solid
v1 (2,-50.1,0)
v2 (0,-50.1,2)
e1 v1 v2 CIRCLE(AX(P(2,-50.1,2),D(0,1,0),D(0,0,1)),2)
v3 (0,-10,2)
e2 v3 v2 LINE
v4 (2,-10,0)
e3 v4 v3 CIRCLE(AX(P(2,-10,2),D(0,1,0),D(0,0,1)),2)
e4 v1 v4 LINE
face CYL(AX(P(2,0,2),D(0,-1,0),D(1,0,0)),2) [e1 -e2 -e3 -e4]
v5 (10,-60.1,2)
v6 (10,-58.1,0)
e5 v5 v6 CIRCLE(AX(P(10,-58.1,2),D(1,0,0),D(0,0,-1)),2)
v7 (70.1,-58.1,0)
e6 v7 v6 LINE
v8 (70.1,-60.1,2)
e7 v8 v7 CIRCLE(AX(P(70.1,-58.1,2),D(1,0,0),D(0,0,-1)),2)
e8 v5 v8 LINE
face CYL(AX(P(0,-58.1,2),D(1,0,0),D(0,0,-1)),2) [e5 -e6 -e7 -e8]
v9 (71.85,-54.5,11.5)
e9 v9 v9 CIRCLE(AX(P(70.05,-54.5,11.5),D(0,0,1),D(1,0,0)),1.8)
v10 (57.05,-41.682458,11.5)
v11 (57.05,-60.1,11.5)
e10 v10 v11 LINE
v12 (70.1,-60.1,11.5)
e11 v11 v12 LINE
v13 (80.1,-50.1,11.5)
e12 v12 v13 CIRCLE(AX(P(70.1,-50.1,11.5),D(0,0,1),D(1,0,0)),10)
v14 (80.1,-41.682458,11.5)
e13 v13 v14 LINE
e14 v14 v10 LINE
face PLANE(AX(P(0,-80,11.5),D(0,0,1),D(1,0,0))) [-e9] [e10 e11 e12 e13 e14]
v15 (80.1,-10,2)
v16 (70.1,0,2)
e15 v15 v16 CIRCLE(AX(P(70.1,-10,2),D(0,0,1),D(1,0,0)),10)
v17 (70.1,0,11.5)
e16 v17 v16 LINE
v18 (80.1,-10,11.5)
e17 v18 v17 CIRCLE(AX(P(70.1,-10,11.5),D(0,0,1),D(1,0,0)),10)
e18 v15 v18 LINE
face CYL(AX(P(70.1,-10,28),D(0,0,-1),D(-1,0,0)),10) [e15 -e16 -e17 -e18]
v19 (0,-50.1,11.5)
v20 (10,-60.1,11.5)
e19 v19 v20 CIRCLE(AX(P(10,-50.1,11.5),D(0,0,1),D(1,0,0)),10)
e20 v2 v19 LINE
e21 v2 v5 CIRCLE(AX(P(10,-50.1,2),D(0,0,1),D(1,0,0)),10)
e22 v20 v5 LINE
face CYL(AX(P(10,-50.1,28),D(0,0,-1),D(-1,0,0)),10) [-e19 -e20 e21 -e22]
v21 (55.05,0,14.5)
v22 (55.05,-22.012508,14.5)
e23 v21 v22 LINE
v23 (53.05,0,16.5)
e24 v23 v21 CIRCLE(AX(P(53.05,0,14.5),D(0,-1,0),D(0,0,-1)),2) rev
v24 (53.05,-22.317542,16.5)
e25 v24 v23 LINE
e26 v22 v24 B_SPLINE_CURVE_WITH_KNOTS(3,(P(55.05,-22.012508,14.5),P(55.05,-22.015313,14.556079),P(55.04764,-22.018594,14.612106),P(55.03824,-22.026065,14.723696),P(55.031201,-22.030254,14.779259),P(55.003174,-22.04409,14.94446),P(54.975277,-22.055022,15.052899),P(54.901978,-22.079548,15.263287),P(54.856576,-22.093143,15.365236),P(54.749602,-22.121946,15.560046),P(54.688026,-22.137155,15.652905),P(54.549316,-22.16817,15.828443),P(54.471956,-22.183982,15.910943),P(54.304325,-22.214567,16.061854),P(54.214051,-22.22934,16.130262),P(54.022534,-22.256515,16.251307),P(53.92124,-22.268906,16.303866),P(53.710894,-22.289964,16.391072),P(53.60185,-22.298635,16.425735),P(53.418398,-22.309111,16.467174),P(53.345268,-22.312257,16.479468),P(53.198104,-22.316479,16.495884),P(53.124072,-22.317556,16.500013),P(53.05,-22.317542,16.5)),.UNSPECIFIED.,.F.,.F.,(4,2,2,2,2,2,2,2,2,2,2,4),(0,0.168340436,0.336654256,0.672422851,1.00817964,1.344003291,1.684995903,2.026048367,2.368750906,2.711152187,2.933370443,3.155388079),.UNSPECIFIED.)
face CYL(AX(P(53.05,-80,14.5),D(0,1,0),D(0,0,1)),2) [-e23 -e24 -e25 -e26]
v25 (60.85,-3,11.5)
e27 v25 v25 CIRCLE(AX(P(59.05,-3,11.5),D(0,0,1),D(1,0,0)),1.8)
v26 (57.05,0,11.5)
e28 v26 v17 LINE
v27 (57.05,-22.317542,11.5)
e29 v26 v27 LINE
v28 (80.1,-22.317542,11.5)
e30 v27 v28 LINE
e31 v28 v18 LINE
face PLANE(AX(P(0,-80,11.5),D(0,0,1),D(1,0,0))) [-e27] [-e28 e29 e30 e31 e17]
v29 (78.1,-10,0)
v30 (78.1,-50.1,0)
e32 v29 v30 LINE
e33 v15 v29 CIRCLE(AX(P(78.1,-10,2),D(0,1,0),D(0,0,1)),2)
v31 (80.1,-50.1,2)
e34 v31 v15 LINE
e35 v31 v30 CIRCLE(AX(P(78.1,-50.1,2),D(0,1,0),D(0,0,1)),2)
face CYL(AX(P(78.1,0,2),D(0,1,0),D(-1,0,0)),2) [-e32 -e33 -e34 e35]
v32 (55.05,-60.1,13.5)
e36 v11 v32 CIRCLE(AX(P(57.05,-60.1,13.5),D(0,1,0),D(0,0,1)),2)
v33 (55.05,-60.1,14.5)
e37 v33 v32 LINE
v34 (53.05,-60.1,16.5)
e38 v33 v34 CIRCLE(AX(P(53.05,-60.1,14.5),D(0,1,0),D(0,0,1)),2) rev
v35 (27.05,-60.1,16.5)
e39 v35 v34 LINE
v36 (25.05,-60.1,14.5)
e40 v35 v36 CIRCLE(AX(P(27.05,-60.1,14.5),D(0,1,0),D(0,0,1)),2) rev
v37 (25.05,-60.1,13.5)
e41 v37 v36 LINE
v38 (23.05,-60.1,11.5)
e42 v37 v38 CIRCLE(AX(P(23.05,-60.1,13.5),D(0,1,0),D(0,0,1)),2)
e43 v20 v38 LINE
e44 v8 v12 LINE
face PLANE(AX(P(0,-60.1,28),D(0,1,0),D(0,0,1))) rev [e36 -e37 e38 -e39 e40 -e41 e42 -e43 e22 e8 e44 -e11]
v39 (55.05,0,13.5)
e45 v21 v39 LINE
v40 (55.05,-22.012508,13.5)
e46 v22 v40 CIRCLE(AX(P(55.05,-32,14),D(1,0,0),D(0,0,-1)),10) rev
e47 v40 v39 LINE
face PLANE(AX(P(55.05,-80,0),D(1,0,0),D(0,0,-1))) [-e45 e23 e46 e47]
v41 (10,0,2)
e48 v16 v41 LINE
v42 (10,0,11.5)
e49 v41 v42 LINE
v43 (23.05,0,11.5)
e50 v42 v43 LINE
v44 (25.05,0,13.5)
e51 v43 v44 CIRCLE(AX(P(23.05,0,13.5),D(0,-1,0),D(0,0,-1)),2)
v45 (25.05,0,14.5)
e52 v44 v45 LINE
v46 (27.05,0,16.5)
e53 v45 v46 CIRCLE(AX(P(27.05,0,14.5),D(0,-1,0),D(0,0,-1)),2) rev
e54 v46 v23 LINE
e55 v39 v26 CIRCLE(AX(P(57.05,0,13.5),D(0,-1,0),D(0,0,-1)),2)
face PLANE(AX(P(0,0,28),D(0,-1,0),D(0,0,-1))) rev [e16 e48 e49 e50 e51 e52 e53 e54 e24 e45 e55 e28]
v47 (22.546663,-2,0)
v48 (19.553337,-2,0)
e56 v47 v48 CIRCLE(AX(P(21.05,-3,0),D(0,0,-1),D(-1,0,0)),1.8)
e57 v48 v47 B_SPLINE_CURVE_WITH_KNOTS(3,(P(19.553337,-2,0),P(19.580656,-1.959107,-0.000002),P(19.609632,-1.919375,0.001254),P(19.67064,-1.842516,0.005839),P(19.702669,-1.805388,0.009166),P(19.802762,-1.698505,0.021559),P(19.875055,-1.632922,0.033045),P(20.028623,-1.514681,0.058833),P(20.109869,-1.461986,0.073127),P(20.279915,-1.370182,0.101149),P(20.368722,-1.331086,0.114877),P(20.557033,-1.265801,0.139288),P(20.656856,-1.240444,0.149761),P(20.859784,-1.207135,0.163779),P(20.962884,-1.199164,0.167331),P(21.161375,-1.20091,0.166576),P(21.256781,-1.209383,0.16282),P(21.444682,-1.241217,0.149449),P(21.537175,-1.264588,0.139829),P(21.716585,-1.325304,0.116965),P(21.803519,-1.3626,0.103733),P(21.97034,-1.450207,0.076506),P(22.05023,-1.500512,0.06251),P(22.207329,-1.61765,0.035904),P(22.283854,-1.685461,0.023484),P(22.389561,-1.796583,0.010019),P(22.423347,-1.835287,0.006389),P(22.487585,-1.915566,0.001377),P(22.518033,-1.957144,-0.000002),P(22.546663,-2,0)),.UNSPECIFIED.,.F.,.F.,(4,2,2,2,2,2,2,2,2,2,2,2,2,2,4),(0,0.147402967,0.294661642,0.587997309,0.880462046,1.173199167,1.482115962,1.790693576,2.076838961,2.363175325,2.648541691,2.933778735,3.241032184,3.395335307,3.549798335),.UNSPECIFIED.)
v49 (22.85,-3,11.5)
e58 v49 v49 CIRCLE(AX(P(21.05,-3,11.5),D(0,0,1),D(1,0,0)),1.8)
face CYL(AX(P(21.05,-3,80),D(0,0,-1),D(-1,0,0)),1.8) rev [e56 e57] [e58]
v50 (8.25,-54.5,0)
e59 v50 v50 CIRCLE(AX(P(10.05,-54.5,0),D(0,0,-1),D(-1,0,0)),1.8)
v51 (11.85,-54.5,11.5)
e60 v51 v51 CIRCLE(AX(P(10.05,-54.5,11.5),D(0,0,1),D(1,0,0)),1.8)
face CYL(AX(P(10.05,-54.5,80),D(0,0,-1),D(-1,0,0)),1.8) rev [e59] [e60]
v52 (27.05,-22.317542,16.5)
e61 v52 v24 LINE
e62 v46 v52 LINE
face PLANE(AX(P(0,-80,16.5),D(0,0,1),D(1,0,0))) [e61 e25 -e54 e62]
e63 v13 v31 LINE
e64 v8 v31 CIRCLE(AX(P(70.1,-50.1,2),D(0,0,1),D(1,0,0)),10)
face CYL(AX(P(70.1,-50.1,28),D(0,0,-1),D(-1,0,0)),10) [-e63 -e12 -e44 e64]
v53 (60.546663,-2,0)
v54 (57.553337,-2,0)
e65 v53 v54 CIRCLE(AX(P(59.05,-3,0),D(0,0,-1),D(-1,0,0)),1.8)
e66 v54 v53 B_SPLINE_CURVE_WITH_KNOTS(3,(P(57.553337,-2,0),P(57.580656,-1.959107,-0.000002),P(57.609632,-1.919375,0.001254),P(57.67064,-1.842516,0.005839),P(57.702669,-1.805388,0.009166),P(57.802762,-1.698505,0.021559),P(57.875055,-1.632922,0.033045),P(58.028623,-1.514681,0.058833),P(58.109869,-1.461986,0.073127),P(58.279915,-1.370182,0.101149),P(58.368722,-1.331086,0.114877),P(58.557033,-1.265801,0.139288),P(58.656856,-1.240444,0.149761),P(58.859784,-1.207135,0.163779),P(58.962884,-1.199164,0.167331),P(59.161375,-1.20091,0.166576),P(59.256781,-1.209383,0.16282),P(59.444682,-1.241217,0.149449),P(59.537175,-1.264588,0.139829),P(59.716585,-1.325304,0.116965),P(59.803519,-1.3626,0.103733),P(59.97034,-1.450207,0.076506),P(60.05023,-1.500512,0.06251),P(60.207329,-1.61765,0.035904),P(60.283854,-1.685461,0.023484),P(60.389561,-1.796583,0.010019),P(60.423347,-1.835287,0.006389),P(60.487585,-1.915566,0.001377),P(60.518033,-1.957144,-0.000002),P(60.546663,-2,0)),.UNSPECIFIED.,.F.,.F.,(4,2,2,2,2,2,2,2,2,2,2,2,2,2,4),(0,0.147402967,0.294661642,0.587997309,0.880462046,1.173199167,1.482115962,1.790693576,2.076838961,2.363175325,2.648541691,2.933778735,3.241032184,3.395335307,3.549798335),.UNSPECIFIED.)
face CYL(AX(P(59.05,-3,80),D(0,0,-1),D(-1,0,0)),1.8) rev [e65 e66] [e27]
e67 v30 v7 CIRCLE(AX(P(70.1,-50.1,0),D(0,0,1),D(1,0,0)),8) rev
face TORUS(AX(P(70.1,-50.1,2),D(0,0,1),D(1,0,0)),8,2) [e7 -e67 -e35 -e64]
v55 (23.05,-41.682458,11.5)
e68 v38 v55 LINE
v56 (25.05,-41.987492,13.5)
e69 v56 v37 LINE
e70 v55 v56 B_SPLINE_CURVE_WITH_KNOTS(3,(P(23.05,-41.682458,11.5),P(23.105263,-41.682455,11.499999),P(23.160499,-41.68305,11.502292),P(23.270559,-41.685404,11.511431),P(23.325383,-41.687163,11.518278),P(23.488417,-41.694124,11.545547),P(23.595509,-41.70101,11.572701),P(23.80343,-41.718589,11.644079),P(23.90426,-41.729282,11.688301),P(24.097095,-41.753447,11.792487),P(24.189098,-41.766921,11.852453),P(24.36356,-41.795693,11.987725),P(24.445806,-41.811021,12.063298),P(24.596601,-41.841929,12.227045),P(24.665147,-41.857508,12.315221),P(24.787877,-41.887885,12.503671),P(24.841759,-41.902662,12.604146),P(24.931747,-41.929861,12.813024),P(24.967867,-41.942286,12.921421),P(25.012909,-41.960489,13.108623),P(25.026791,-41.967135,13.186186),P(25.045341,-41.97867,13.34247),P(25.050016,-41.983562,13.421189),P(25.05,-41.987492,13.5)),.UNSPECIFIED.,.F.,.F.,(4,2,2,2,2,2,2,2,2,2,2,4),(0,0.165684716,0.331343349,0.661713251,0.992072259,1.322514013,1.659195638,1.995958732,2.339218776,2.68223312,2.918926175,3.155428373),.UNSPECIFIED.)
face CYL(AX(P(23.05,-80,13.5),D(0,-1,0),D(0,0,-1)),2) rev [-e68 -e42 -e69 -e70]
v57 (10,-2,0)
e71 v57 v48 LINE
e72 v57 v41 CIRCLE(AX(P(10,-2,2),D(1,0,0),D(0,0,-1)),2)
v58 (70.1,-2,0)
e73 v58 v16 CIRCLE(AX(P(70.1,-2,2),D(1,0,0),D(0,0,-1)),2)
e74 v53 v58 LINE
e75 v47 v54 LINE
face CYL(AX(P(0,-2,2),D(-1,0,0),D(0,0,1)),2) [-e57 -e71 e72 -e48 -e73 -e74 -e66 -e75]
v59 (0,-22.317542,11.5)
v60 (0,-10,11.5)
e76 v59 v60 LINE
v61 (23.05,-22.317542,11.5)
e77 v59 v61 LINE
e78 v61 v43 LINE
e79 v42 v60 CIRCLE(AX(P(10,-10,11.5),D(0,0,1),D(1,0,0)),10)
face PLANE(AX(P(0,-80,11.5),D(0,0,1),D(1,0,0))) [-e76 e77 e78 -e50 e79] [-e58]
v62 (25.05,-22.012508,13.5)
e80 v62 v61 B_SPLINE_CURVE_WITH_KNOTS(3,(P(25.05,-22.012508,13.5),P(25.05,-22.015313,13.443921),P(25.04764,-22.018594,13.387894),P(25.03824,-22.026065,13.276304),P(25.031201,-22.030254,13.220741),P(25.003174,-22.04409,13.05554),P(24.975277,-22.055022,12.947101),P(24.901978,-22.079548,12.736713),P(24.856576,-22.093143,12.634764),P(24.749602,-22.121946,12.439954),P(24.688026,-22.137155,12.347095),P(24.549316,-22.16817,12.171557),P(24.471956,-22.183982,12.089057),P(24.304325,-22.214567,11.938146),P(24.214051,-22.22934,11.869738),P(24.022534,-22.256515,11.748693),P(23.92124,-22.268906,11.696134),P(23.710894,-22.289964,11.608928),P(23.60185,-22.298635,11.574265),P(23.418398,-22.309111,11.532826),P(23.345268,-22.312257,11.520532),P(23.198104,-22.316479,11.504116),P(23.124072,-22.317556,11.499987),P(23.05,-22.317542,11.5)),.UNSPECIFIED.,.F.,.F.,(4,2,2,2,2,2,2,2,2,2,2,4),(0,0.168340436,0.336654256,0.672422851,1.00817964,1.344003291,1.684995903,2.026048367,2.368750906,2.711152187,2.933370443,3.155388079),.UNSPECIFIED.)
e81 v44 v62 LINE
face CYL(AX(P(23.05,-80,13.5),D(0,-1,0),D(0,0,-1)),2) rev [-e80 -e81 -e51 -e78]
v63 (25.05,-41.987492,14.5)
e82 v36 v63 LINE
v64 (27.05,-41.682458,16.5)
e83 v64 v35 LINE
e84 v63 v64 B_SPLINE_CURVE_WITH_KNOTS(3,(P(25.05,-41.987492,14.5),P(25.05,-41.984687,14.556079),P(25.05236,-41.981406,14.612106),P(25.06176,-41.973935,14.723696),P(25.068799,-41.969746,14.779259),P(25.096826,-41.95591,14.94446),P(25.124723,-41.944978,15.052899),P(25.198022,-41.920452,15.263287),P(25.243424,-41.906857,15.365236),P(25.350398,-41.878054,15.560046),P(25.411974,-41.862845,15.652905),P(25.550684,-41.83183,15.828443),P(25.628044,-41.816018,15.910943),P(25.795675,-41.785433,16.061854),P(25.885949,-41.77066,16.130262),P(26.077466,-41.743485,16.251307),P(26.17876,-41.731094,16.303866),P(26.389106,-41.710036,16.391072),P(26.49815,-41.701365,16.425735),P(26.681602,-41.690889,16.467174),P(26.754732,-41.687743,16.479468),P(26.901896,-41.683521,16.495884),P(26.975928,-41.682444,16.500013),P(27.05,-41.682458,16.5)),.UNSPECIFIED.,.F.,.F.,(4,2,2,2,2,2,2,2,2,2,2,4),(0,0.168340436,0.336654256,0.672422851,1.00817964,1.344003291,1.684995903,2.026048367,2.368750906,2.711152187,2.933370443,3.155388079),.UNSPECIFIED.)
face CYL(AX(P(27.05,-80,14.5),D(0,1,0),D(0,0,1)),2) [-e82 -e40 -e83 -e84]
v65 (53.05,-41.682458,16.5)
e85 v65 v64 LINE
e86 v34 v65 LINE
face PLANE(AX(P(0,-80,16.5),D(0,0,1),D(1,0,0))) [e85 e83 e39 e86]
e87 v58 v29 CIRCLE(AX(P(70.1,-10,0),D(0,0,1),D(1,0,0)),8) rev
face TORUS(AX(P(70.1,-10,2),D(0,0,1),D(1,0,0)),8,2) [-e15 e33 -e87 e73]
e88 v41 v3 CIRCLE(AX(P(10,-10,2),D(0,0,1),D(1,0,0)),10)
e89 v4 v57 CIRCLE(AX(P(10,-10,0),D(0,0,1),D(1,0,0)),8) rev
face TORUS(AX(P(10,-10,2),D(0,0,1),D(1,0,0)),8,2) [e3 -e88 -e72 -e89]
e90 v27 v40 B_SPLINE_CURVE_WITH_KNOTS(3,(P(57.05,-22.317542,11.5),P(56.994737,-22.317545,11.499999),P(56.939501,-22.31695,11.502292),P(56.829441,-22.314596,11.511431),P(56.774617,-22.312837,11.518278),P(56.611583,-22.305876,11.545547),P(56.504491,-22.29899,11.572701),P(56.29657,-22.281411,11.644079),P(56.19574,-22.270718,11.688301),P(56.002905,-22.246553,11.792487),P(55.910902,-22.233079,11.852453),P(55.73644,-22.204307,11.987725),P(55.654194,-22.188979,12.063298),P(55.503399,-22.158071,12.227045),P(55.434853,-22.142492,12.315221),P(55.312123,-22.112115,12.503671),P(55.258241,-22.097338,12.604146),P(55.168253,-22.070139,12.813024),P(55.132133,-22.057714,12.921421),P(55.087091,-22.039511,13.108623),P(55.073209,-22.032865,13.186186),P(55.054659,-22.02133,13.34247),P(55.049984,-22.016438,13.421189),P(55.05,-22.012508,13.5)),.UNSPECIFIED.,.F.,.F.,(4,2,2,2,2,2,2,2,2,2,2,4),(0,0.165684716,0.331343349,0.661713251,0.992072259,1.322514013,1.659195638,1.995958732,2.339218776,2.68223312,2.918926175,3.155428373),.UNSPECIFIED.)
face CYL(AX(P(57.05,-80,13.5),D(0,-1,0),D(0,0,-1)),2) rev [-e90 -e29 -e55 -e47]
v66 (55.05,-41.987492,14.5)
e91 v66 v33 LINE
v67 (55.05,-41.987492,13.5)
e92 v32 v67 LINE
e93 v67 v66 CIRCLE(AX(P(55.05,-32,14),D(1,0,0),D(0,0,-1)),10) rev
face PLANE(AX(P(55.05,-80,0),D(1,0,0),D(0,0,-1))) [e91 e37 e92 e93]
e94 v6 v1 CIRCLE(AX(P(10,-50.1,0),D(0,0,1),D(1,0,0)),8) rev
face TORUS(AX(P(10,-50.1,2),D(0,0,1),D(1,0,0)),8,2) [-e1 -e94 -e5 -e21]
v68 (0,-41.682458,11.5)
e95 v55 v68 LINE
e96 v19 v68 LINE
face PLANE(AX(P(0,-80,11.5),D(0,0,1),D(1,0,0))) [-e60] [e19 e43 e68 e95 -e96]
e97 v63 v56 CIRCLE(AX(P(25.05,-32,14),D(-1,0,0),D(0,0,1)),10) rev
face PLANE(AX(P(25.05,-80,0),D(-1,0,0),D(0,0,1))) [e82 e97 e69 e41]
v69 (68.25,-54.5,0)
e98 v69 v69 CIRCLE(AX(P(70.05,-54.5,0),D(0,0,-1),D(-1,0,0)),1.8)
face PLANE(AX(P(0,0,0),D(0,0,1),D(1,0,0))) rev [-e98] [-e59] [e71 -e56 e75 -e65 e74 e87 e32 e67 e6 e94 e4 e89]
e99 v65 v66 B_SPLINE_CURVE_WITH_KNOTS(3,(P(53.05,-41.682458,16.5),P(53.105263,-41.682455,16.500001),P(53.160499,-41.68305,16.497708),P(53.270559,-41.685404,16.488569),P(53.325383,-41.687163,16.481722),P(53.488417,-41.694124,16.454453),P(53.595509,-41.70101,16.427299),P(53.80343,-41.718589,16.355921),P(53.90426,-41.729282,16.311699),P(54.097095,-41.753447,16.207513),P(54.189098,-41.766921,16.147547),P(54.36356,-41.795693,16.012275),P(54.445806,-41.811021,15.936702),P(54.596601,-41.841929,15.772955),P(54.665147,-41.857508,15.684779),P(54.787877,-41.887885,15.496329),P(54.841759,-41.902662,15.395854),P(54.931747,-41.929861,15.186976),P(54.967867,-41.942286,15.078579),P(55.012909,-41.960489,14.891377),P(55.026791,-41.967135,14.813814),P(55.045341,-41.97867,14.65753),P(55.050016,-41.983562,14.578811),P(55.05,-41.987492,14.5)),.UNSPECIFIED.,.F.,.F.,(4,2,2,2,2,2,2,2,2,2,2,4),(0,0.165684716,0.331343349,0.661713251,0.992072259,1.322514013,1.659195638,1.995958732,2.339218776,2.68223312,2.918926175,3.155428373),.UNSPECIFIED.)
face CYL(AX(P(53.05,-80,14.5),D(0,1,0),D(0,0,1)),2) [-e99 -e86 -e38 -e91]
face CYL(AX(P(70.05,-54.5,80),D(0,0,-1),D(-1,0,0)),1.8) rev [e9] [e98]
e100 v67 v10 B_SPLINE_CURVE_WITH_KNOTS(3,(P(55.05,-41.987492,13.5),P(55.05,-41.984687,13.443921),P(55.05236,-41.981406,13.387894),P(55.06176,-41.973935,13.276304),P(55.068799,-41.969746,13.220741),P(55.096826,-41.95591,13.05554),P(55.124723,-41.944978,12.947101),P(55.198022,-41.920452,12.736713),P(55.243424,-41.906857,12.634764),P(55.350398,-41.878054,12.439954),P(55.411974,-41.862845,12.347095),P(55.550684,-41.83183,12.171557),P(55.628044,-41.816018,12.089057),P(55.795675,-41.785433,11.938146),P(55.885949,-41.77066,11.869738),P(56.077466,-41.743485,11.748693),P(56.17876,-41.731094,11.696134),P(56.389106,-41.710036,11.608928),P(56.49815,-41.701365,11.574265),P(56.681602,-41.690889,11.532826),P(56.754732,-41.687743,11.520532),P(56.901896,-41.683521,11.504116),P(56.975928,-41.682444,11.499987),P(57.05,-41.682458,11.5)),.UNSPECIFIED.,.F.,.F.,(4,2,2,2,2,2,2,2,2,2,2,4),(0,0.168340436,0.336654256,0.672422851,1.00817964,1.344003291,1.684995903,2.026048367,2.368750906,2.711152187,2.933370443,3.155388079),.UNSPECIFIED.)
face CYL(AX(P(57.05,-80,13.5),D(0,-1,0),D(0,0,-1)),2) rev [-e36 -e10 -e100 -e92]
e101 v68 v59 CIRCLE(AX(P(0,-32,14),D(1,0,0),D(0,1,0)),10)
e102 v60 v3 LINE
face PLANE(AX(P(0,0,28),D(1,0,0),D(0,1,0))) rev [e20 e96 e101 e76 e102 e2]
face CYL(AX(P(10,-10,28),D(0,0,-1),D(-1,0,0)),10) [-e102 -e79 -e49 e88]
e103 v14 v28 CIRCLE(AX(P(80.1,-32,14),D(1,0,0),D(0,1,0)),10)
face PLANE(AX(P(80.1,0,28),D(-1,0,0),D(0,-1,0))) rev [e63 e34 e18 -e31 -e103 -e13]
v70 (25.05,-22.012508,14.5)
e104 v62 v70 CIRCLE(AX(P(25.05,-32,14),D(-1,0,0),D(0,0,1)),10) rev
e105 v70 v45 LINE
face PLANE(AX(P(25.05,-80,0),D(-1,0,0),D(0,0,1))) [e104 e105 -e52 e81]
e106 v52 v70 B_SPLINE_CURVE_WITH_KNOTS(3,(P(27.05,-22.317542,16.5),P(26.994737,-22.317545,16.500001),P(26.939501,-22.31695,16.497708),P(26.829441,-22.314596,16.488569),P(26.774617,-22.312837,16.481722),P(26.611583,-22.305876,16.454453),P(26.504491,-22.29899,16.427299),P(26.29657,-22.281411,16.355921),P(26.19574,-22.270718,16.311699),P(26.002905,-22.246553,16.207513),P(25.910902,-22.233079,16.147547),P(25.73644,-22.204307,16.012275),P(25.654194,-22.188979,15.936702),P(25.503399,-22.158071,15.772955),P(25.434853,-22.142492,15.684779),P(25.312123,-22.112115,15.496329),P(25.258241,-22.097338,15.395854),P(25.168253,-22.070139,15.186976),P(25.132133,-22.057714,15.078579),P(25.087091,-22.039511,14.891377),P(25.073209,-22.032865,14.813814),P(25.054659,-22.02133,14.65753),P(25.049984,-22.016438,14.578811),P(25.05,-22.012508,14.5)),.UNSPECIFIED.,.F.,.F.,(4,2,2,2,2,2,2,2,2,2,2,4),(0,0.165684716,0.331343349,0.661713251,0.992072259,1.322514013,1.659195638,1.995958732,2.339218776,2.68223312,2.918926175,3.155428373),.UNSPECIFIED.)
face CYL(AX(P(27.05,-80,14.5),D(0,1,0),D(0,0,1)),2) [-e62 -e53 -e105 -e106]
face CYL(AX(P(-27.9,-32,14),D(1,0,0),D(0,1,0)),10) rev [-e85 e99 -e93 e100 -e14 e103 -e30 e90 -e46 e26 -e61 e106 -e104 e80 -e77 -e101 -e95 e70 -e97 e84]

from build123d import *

# Parameters (mm, degrees)
SKETCH_1_W          = 80.1
SKETCH_1_H          = 60.1
EXTRUDE_1_DEPTH     = 28
CUT_EXTRUDE_1_DEPTH = 108
CUT_EXTRUDE_2_DEPTH = 80
FILLET_1_R          = 2
SKETCH_4_R          = 1.8
CUT_EXTRUDE_3_DEPTH = 80
FILLET_2_R          = 10
FILLET_3_R          = 2


with BuildPart() as part:
    # 草图1 → 凸台-拉伸1 (new body)
    with BuildSketch(Plane.XY):
        with Locations((40.05, -30.05)):
            Rectangle(SKETCH_1_W, SKETCH_1_H)
    extrude(amount=EXTRUDE_1_DEPTH)

    # 草图2 → 切除-拉伸1 (cut)
    with BuildSketch(Plane(origin=(80.1, 0, 0), x_dir=(0, 0, -1), z_dir=(1, 0, 0))):
        with BuildLine():
            ThreePointArc((-4, -32), (-6.928932188, -24.928932188), (-14, -22))
            Line((-14, -22), (-14, -32))
            Line((-14, -32), (-4, -32))
        make_face()
        with BuildLine():
            Line((-14, -32), (-14, -22))
            ThreePointArc((-14, -22), (-21.071067812, -24.928932188), (-24, -32))
            Line((-24, -32), (-14, -32))
        make_face()
        with BuildLine():
            Line((-4, -32), (-14, -32))
            Line((-14, -32), (-14, -42))
            ThreePointArc((-14, -42), (-6.928932188, -39.071067812), (-4, -32))
        make_face()
        with BuildLine():
            Line((-14, -42), (-14, -32))
            Line((-14, -32), (-24, -32))
            ThreePointArc((-24, -32), (-21.071067812, -39.071067812), (-14, -42))
        make_face()
    extrude(amount=-CUT_EXTRUDE_1_DEPTH, mode=Mode.SUBTRACT)

    # 草图3 → 切除-拉伸2 (cut)
    with BuildSketch(Plane(origin=(0, 0, 0), x_dir=(1, 0, 0), z_dir=(0, 1, 0))):
        Polygon((25.05, -11.5), (0, -11.5), (0, -28), (80.1, -28), (80.1, -11.5), (55.05, -11.5), (55.05, -16.5), (25.05, -16.5), align=None)
    extrude(amount=-CUT_EXTRUDE_2_DEPTH, mode=Mode.SUBTRACT)

    # 圆角1
    fillet_1_edges = [part.edges().sort_by_distance(p)[0] for p in [
        (55.05, -50.891229183, 11.5),
        (55.05, -11.158770817, 11.5),
        (25.05, -50.891229183, 11.5),
        (25.05, -11.158770817, 11.5),
        (25.05, -50.891229183, 16.5),
        (25.05, -11.158770817, 16.5),
        (55.05, -50.891229183, 16.5),
        (55.05, -11.158770817, 16.5),
    ]]
    fillet(fillet_1_edges, radius=FILLET_1_R)

    # 草图4 → 切除-拉伸3 (cut)
    with BuildSketch(Plane(origin=(0, 0, 0), x_dir=(-1, 0, 0), z_dir=(0, 0, -1))):
        with Locations((-70.05, -54.5)):
            Circle(SKETCH_4_R)
        with Locations((-10.05, -54.5)):
            Circle(SKETCH_4_R)
        with Locations((-21.05, -3)):
            Circle(SKETCH_4_R)
        with Locations((-59.05, -3)):
            Circle(SKETCH_4_R)
    extrude(amount=-CUT_EXTRUDE_3_DEPTH, mode=Mode.SUBTRACT)

    # 圆角2
    fillet_2_edges = [part.edges().sort_by_distance(p)[0] for p in [
        (0, 0, 5.75),
        (80.1, 0, 5.75),
        (80.1, -60.1, 5.75),
        (0, -60.1, 5.75),
    ]]
    fillet(fillet_2_edges, radius=FILLET_2_R)

    # 圆角3
    # the kernel refuses this fillet: 2 mm, written as the material it takes off along each edge
    with BuildSketch(Plane(origin=(80.1, -10, 0), x_dir=(-1, 0, 0), z_dir=(0, -1, 0)), Plane(origin=(0, -50.1, 0), x_dir=(1, 0, 0), z_dir=(0, 1, 0))) as fillet_3_piece_1:
        with BuildLine():
            CenterArc((FILLET_3_R, -FILLET_3_R), FILLET_3_R, 90, 90)
            Line((0, -FILLET_3_R), (0, 0))
            Line((0, 0), (FILLET_3_R, 0))
        make_face()
    extrude(amount=40.1, mode=Mode.SUBTRACT)
    with BuildSketch(Plane(origin=(10, 0, 0), x_dir=(0, 0, 1), z_dir=(1, 0, 0))) as fillet_3_piece_2:
        with BuildLine():
            CenterArc((FILLET_3_R, FILLET_3_R), FILLET_3_R, 180, 90)
            Line((0, FILLET_3_R), (0, 0))
            Line((0, 0), (FILLET_3_R, 0))
        make_face()
    extrude(amount=60.1, mode=Mode.SUBTRACT)
    with BuildSketch(Plane(origin=(70.1, -60.1, 0), x_dir=(0, 1, 0), z_dir=(-1, 0, 0))) as fillet_3_piece_3:
        with BuildLine():
            CenterArc((FILLET_3_R, -FILLET_3_R), FILLET_3_R, 90, 90)
            Line((0, -FILLET_3_R), (0, 0))
            Line((0, 0), (FILLET_3_R, 0))
        make_face()
    extrude(amount=60.1, mode=Mode.SUBTRACT)
    with BuildSketch(Plane(origin=(10, -10, 0), x_dir=(0, 1, 0), z_dir=(1, 0, 0))) as fillet_3_piece_4:
        with BuildLine():
            CenterArc((10 - FILLET_3_R, FILLET_3_R), FILLET_3_R, 270, 90)
            Line((10, FILLET_3_R), (10, 0))
            Line((10, 0), (10 - FILLET_3_R, 0))
        make_face()
    revolve(axis=Axis((10, -10, 0), (0, 0, 1)), revolution_arc=90, mode=Mode.SUBTRACT)
    with BuildSketch(Plane(origin=(10, -50.1, 0), x_dir=(-1, 0, 0), z_dir=(0, 1, 0))) as fillet_3_piece_5:
        with BuildLine():
            CenterArc((10 - FILLET_3_R, FILLET_3_R), FILLET_3_R, 270, 90)
            Line((10, FILLET_3_R), (10, 0))
            Line((10, 0), (10 - FILLET_3_R, 0))
        make_face()
    revolve(axis=Axis((10, -50.1, 0), (0, 0, 1)), revolution_arc=90, mode=Mode.SUBTRACT)
    with BuildSketch(Plane(origin=(70.1, -10, 0), x_dir=(0, 1, 0), z_dir=(-1, 0, 0))) as fillet_3_piece_6:
        with BuildLine():
            CenterArc((10 - FILLET_3_R, -FILLET_3_R), FILLET_3_R, 0, 90)
            Line((10 - FILLET_3_R, 0), (10, 0))
            Line((10, 0), (10, -FILLET_3_R))
        make_face()
    revolve(axis=Axis((70.1, -10, 0), (0, 0, -1)), revolution_arc=90, mode=Mode.SUBTRACT)
    with BuildSketch(Plane(origin=(70.1, -50.1, 0), x_dir=(1, 0, 0), z_dir=(0, 1, 0))) as fillet_3_piece_7:
        with BuildLine():
            CenterArc((10 - FILLET_3_R, -FILLET_3_R), FILLET_3_R, 0, 90)
            Line((10, -FILLET_3_R), (10, 0))
            Line((10, 0), (10 - FILLET_3_R, 0))
        make_face()
    revolve(axis=Axis((70.1, -50.1, 0), (0, 0, -1)), revolution_arc=90, mode=Mode.SUBTRACT)


solid = part.part
